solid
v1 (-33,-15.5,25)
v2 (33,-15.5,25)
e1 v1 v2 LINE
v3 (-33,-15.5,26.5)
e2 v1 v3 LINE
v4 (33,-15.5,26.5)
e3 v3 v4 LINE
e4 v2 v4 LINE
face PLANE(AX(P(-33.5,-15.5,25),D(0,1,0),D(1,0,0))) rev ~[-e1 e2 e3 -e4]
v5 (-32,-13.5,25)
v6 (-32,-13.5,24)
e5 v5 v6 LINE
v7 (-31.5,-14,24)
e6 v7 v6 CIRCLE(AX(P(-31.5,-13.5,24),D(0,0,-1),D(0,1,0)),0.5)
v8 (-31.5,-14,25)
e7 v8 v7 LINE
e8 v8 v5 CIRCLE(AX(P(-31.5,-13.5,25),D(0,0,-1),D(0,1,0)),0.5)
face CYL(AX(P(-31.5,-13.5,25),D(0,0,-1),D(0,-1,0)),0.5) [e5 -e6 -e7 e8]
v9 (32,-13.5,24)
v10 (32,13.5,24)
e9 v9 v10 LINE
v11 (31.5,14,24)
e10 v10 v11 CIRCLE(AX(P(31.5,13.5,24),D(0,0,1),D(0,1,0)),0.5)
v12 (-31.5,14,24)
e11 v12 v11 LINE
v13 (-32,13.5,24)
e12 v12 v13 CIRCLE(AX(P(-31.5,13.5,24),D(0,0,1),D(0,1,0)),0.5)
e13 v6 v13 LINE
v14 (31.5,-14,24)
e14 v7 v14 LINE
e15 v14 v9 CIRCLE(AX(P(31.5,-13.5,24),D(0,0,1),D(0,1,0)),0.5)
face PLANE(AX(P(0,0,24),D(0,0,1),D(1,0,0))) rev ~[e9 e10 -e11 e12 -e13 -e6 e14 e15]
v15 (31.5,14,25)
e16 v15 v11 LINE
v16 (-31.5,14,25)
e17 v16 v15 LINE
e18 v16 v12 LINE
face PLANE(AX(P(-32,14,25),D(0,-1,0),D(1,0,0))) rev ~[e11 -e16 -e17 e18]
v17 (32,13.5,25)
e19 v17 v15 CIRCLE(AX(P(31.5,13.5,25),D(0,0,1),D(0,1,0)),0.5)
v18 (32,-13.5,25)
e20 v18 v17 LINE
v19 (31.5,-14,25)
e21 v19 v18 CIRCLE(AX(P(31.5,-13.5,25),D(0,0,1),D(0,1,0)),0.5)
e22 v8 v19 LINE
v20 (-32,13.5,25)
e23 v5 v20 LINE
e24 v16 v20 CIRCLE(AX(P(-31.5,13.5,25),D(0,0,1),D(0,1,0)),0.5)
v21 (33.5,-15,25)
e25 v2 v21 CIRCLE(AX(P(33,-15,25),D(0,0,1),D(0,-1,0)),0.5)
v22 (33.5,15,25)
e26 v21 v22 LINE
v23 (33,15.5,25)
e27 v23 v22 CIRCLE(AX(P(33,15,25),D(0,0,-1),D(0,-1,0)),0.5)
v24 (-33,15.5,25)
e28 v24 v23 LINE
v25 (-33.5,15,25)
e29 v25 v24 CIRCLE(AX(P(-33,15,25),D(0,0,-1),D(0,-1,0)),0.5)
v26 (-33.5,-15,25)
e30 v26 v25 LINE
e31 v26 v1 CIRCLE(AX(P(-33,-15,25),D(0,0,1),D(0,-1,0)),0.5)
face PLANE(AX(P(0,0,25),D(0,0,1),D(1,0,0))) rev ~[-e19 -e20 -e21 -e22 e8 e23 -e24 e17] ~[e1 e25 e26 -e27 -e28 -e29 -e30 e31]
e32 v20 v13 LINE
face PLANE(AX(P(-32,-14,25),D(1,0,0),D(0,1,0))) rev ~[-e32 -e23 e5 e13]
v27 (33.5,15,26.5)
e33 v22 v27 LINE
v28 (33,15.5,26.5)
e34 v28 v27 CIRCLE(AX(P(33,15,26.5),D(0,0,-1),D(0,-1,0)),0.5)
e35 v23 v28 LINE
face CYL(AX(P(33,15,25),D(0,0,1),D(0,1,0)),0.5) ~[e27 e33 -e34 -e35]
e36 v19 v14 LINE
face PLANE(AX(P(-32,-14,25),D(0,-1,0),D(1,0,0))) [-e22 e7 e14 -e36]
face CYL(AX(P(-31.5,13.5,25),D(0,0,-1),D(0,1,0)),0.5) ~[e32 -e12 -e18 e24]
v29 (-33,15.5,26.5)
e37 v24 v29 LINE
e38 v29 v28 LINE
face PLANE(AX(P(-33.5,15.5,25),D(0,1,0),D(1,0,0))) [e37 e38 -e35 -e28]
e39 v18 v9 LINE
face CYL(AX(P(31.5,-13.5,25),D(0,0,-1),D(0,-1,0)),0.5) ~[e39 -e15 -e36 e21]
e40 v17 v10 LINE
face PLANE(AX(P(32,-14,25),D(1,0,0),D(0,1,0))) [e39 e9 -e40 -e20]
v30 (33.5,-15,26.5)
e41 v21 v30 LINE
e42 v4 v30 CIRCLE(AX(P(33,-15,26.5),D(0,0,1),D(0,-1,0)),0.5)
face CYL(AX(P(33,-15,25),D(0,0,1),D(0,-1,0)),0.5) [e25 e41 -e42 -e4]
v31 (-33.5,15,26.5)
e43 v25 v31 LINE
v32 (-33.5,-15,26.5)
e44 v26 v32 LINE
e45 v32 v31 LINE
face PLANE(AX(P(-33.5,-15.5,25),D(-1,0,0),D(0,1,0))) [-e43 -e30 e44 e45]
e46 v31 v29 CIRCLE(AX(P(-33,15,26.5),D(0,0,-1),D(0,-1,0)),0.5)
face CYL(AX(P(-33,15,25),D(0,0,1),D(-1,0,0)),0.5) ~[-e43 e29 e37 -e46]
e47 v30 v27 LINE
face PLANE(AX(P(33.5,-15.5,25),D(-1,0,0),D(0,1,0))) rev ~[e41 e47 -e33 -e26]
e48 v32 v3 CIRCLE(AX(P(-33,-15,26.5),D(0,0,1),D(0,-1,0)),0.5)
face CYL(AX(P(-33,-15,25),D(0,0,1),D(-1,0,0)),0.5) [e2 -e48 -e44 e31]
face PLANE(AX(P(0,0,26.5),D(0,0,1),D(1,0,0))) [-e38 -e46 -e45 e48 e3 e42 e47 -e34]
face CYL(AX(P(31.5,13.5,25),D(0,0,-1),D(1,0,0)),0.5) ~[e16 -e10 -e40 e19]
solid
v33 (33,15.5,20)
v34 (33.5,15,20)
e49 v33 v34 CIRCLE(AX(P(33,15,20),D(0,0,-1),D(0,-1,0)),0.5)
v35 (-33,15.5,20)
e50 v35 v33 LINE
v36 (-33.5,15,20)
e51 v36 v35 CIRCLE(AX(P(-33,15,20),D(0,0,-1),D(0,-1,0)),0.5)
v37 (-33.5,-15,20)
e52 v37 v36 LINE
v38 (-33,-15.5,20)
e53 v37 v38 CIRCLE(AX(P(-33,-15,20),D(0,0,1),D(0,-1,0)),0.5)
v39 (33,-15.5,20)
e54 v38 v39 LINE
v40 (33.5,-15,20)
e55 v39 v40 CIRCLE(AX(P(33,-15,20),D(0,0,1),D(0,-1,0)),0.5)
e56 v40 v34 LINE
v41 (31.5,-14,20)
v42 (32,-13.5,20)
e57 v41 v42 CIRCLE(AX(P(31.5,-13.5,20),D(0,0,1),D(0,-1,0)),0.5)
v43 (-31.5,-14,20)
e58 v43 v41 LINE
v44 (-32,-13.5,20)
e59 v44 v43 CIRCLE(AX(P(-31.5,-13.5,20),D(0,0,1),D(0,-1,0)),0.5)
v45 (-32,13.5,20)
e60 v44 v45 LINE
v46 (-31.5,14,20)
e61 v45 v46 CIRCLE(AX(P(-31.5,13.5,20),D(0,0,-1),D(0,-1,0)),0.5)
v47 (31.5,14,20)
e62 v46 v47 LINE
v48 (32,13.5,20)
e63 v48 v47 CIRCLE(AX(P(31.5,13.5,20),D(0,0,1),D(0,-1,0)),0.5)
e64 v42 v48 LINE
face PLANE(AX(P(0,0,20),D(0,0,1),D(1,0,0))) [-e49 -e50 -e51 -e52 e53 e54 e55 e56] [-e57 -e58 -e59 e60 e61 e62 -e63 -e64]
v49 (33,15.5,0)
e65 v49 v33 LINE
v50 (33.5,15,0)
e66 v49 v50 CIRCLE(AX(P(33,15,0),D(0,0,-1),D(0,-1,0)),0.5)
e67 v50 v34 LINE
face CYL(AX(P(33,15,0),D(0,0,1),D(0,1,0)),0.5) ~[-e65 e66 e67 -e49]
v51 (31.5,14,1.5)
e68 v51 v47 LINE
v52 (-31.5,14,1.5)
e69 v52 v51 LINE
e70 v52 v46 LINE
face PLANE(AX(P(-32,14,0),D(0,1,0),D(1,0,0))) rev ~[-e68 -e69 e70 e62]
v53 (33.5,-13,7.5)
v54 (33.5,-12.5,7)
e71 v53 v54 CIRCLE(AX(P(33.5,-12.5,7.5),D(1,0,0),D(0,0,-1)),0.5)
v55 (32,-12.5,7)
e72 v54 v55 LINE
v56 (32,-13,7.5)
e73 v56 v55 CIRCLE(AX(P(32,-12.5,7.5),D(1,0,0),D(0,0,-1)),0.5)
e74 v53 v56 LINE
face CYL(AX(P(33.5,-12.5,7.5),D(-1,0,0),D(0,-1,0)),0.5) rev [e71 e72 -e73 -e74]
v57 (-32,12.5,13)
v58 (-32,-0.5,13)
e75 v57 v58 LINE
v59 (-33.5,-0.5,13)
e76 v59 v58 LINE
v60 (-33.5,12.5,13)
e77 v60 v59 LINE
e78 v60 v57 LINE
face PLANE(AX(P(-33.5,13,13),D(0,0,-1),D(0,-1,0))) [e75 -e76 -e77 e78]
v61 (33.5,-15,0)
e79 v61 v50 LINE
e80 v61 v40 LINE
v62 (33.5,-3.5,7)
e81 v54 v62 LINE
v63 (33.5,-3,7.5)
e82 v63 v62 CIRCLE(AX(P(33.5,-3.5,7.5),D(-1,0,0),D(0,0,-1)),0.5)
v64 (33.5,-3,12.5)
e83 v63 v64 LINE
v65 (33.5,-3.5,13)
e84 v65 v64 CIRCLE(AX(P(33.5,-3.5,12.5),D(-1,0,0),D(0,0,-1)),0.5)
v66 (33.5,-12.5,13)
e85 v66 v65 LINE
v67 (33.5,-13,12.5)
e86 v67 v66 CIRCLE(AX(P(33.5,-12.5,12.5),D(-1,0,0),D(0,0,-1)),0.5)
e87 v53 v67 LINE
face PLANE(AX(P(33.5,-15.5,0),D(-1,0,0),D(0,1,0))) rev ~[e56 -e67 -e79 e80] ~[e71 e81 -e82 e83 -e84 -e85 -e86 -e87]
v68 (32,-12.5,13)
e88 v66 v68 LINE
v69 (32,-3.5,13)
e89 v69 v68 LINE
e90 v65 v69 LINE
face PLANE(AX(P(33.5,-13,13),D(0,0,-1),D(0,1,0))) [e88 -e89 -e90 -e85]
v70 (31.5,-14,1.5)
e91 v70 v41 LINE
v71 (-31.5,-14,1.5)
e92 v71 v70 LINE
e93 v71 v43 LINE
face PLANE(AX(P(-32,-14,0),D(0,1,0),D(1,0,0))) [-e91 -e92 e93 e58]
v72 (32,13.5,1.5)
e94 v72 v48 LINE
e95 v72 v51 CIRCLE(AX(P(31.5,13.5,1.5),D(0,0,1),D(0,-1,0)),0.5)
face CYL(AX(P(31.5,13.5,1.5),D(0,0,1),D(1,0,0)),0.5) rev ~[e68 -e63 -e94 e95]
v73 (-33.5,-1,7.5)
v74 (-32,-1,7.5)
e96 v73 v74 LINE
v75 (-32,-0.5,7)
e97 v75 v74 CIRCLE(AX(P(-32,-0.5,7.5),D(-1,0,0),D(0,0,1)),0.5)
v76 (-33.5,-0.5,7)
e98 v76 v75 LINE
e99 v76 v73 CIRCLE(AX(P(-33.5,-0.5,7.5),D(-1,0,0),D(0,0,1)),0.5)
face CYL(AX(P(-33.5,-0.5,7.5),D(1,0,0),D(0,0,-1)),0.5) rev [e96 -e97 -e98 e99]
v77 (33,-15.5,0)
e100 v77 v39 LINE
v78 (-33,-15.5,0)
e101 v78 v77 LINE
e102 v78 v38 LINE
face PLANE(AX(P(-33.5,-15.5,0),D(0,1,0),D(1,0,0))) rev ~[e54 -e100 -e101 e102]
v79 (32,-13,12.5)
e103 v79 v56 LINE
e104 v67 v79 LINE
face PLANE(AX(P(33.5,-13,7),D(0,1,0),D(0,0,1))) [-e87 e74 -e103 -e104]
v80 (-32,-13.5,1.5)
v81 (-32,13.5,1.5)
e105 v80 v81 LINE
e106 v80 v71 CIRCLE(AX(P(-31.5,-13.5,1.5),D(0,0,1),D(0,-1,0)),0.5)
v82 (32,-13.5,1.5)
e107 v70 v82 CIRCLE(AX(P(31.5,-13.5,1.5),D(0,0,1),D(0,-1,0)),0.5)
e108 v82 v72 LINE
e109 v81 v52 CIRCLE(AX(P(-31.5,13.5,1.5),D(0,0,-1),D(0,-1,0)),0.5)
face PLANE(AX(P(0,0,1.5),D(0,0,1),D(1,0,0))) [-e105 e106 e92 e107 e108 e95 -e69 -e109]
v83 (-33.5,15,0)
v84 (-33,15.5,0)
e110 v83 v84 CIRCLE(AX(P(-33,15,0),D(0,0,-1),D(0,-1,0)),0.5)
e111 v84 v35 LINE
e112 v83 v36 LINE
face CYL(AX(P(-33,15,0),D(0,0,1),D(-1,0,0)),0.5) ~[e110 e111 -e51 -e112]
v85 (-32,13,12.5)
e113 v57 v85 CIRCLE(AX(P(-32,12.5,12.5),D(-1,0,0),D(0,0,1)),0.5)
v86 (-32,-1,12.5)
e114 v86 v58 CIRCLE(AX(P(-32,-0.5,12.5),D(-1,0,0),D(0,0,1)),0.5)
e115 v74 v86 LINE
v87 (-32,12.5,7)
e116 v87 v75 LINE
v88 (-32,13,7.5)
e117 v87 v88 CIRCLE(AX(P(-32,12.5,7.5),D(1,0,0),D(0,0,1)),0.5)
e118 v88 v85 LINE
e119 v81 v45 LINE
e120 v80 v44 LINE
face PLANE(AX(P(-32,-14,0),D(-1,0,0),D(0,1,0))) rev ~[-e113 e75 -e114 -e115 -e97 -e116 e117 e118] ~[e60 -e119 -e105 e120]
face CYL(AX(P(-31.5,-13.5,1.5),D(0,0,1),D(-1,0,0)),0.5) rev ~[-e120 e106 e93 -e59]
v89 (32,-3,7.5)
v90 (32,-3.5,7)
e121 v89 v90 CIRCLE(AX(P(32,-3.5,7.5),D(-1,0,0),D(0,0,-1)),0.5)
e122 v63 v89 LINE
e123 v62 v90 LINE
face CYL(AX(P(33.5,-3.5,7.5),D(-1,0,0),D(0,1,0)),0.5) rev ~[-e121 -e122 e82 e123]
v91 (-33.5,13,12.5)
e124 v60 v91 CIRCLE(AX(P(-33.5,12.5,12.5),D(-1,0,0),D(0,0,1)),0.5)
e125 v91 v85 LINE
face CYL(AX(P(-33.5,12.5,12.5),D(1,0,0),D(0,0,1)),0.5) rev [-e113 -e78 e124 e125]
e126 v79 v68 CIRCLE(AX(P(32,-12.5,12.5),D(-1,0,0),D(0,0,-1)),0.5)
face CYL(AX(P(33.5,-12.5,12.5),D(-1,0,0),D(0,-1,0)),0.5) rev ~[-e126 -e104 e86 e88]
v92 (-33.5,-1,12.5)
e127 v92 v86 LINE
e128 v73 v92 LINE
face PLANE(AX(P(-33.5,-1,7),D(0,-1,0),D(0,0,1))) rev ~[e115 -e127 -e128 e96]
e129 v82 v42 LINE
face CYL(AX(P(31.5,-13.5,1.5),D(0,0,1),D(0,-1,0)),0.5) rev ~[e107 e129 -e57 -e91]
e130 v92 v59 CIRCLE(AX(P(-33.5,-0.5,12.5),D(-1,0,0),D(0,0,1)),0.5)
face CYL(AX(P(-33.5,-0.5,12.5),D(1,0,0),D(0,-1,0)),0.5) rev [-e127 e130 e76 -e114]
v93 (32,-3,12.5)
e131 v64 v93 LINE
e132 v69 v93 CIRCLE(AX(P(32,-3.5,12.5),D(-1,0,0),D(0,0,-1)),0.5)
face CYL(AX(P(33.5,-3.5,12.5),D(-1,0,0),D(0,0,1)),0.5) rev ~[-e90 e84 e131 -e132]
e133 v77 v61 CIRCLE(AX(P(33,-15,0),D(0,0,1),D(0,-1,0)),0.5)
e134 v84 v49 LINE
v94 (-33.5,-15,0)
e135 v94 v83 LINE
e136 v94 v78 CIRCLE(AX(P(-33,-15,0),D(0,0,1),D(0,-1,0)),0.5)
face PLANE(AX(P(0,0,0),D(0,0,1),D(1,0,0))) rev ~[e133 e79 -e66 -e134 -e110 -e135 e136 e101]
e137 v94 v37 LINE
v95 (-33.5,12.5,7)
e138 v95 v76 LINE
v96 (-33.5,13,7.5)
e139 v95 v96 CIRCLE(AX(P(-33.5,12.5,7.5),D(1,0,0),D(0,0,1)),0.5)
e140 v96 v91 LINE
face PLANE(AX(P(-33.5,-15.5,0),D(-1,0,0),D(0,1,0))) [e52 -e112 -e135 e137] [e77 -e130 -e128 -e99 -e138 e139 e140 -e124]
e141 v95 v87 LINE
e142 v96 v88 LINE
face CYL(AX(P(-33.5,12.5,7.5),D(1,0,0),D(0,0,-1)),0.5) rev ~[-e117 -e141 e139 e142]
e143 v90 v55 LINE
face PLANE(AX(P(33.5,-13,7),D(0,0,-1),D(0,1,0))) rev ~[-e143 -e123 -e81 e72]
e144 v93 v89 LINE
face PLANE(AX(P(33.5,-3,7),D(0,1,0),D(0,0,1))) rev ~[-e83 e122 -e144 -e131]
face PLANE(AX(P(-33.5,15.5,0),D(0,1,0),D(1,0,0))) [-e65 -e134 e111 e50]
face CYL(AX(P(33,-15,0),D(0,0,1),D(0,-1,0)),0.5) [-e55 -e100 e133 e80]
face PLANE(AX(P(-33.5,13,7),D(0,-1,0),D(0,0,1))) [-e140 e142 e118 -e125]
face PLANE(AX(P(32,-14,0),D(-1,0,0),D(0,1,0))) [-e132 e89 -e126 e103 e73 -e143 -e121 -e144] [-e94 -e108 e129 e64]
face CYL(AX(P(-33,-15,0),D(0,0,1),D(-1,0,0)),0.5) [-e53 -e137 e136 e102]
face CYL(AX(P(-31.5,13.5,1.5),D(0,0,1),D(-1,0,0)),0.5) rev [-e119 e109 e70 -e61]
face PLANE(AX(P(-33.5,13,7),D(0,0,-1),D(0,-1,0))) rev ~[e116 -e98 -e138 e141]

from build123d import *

# Parameters (mm, degrees)
F0_W      = 64
F0_H      = 28
F1_DEPTH  = 1.5
F0_W_2    = 67
F0_H_2    = 31
F2_DEPTH  = 20
F3_W      = 10
F3_H      = 6
F4_DEPTH  = 25
F5_W      = 14
F5_H      = 6
F6_DEPTH  = 25
F7_R      = 0.5
F8_R      = 0.5
F10_W     = 67
F10_H     = 31
F10_W_2   = 64
F10_H_2   = 28
F11_DEPTH = 1.5
F12_DEPTH = 1
F13_R     = 0.5


# Not quite as in the source:
# - a feature names something its author has since deleted; it is built from what else it names


with BuildPart() as f1:
    # F0 (on Top) → F1 (new body)
    with BuildSketch(Plane.XY):
        Rectangle(F0_W, F0_H)
    extrude(amount=F1_DEPTH)

    # F0 (on Top) → F2 (join)
    with BuildSketch(Plane.XY):
        Rectangle(F0_W_2, F0_H_2)
        Rectangle(F0_W, F0_H, mode=Mode.SUBTRACT)
    extrude(amount=F2_DEPTH)

    # F3 (on face) → F4 (cut)
    with BuildSketch(Plane.YZ.offset(33.5)):
        with Locations((-8, 10)):
            Rectangle(F3_W, F3_H)
    extrude(amount=-F4_DEPTH, mode=Mode.SUBTRACT)

    # F5 (on face) → F6 (cut)
    with BuildSketch(Plane(origin=(-33.5, 0, 0), x_dir=(0, -1, 0), z_dir=(-1, 0, 0))):
        with Locations((-6, 10)):
            Rectangle(F5_W, F5_H)
    extrude(amount=-F6_DEPTH, mode=Mode.SUBTRACT)

    # F7
    f7_edges = [f1.edges().sort_by_distance(p)[0] for p in [
        (-32.75, 13, 13),
        (-32.75, 13, 7),
        (-32.75, -1, 13),
        (-32.75, -1, 7),
        (32.75, -13, 13),
        (32.75, -3, 13),
        (32.75, -13, 7),
        (32.75, -3, 7),
    ]]
    fillet(f7_edges, radius=F7_R)

    # F8
    f8_edges = [f1.edges().sort_by_distance(p)[0] for p in [
        (-33.5, -15.5, 10),
        (-33.5, 15.5, 10),
        (33.5, -15.5, 10),
        (33.5, 15.5, 10),
        (32, -14, 10.75),
        (-32, -14, 10.75),
        (-32, 14, 10.75),
        (32, 14, 10.75),
    ]]
    fillet(f8_edges, radius=F8_R)


with BuildPart() as f11:
    # F10 (on offset) → F11 (new body)
    with BuildSketch(Plane.XY.offset(25)):
        Rectangle(F10_W, F10_H)
        Rectangle(F10_W_2, F10_H_2, mode=Mode.SUBTRACT)
        Rectangle(F10_W_2, F10_H_2)
    extrude(amount=F11_DEPTH)

    # F10 (on offset) → F12 (join)
    with BuildSketch(Plane.XY.offset(25)):
        Rectangle(F10_W_2, F10_H_2)
    extrude(amount=-F12_DEPTH)

    # F13
    f13_edges = [f11.edges().sort_by_distance(p)[0] for p in [
        (-32, -14, 24.5),
        (-33.5, -15.5, 25.75),
        (-32, 14, 24.5),
        (-33.5, 15.5, 25.75),
        (32, 14, 24.5),
        (33.5, 15.5, 25.75),
        (32, -14, 24.5),
        (33.5, -15.5, 25.75),
    ]]
    fillet(f13_edges, radius=F13_R)


solid = Compound([f1.part, f11.part])
